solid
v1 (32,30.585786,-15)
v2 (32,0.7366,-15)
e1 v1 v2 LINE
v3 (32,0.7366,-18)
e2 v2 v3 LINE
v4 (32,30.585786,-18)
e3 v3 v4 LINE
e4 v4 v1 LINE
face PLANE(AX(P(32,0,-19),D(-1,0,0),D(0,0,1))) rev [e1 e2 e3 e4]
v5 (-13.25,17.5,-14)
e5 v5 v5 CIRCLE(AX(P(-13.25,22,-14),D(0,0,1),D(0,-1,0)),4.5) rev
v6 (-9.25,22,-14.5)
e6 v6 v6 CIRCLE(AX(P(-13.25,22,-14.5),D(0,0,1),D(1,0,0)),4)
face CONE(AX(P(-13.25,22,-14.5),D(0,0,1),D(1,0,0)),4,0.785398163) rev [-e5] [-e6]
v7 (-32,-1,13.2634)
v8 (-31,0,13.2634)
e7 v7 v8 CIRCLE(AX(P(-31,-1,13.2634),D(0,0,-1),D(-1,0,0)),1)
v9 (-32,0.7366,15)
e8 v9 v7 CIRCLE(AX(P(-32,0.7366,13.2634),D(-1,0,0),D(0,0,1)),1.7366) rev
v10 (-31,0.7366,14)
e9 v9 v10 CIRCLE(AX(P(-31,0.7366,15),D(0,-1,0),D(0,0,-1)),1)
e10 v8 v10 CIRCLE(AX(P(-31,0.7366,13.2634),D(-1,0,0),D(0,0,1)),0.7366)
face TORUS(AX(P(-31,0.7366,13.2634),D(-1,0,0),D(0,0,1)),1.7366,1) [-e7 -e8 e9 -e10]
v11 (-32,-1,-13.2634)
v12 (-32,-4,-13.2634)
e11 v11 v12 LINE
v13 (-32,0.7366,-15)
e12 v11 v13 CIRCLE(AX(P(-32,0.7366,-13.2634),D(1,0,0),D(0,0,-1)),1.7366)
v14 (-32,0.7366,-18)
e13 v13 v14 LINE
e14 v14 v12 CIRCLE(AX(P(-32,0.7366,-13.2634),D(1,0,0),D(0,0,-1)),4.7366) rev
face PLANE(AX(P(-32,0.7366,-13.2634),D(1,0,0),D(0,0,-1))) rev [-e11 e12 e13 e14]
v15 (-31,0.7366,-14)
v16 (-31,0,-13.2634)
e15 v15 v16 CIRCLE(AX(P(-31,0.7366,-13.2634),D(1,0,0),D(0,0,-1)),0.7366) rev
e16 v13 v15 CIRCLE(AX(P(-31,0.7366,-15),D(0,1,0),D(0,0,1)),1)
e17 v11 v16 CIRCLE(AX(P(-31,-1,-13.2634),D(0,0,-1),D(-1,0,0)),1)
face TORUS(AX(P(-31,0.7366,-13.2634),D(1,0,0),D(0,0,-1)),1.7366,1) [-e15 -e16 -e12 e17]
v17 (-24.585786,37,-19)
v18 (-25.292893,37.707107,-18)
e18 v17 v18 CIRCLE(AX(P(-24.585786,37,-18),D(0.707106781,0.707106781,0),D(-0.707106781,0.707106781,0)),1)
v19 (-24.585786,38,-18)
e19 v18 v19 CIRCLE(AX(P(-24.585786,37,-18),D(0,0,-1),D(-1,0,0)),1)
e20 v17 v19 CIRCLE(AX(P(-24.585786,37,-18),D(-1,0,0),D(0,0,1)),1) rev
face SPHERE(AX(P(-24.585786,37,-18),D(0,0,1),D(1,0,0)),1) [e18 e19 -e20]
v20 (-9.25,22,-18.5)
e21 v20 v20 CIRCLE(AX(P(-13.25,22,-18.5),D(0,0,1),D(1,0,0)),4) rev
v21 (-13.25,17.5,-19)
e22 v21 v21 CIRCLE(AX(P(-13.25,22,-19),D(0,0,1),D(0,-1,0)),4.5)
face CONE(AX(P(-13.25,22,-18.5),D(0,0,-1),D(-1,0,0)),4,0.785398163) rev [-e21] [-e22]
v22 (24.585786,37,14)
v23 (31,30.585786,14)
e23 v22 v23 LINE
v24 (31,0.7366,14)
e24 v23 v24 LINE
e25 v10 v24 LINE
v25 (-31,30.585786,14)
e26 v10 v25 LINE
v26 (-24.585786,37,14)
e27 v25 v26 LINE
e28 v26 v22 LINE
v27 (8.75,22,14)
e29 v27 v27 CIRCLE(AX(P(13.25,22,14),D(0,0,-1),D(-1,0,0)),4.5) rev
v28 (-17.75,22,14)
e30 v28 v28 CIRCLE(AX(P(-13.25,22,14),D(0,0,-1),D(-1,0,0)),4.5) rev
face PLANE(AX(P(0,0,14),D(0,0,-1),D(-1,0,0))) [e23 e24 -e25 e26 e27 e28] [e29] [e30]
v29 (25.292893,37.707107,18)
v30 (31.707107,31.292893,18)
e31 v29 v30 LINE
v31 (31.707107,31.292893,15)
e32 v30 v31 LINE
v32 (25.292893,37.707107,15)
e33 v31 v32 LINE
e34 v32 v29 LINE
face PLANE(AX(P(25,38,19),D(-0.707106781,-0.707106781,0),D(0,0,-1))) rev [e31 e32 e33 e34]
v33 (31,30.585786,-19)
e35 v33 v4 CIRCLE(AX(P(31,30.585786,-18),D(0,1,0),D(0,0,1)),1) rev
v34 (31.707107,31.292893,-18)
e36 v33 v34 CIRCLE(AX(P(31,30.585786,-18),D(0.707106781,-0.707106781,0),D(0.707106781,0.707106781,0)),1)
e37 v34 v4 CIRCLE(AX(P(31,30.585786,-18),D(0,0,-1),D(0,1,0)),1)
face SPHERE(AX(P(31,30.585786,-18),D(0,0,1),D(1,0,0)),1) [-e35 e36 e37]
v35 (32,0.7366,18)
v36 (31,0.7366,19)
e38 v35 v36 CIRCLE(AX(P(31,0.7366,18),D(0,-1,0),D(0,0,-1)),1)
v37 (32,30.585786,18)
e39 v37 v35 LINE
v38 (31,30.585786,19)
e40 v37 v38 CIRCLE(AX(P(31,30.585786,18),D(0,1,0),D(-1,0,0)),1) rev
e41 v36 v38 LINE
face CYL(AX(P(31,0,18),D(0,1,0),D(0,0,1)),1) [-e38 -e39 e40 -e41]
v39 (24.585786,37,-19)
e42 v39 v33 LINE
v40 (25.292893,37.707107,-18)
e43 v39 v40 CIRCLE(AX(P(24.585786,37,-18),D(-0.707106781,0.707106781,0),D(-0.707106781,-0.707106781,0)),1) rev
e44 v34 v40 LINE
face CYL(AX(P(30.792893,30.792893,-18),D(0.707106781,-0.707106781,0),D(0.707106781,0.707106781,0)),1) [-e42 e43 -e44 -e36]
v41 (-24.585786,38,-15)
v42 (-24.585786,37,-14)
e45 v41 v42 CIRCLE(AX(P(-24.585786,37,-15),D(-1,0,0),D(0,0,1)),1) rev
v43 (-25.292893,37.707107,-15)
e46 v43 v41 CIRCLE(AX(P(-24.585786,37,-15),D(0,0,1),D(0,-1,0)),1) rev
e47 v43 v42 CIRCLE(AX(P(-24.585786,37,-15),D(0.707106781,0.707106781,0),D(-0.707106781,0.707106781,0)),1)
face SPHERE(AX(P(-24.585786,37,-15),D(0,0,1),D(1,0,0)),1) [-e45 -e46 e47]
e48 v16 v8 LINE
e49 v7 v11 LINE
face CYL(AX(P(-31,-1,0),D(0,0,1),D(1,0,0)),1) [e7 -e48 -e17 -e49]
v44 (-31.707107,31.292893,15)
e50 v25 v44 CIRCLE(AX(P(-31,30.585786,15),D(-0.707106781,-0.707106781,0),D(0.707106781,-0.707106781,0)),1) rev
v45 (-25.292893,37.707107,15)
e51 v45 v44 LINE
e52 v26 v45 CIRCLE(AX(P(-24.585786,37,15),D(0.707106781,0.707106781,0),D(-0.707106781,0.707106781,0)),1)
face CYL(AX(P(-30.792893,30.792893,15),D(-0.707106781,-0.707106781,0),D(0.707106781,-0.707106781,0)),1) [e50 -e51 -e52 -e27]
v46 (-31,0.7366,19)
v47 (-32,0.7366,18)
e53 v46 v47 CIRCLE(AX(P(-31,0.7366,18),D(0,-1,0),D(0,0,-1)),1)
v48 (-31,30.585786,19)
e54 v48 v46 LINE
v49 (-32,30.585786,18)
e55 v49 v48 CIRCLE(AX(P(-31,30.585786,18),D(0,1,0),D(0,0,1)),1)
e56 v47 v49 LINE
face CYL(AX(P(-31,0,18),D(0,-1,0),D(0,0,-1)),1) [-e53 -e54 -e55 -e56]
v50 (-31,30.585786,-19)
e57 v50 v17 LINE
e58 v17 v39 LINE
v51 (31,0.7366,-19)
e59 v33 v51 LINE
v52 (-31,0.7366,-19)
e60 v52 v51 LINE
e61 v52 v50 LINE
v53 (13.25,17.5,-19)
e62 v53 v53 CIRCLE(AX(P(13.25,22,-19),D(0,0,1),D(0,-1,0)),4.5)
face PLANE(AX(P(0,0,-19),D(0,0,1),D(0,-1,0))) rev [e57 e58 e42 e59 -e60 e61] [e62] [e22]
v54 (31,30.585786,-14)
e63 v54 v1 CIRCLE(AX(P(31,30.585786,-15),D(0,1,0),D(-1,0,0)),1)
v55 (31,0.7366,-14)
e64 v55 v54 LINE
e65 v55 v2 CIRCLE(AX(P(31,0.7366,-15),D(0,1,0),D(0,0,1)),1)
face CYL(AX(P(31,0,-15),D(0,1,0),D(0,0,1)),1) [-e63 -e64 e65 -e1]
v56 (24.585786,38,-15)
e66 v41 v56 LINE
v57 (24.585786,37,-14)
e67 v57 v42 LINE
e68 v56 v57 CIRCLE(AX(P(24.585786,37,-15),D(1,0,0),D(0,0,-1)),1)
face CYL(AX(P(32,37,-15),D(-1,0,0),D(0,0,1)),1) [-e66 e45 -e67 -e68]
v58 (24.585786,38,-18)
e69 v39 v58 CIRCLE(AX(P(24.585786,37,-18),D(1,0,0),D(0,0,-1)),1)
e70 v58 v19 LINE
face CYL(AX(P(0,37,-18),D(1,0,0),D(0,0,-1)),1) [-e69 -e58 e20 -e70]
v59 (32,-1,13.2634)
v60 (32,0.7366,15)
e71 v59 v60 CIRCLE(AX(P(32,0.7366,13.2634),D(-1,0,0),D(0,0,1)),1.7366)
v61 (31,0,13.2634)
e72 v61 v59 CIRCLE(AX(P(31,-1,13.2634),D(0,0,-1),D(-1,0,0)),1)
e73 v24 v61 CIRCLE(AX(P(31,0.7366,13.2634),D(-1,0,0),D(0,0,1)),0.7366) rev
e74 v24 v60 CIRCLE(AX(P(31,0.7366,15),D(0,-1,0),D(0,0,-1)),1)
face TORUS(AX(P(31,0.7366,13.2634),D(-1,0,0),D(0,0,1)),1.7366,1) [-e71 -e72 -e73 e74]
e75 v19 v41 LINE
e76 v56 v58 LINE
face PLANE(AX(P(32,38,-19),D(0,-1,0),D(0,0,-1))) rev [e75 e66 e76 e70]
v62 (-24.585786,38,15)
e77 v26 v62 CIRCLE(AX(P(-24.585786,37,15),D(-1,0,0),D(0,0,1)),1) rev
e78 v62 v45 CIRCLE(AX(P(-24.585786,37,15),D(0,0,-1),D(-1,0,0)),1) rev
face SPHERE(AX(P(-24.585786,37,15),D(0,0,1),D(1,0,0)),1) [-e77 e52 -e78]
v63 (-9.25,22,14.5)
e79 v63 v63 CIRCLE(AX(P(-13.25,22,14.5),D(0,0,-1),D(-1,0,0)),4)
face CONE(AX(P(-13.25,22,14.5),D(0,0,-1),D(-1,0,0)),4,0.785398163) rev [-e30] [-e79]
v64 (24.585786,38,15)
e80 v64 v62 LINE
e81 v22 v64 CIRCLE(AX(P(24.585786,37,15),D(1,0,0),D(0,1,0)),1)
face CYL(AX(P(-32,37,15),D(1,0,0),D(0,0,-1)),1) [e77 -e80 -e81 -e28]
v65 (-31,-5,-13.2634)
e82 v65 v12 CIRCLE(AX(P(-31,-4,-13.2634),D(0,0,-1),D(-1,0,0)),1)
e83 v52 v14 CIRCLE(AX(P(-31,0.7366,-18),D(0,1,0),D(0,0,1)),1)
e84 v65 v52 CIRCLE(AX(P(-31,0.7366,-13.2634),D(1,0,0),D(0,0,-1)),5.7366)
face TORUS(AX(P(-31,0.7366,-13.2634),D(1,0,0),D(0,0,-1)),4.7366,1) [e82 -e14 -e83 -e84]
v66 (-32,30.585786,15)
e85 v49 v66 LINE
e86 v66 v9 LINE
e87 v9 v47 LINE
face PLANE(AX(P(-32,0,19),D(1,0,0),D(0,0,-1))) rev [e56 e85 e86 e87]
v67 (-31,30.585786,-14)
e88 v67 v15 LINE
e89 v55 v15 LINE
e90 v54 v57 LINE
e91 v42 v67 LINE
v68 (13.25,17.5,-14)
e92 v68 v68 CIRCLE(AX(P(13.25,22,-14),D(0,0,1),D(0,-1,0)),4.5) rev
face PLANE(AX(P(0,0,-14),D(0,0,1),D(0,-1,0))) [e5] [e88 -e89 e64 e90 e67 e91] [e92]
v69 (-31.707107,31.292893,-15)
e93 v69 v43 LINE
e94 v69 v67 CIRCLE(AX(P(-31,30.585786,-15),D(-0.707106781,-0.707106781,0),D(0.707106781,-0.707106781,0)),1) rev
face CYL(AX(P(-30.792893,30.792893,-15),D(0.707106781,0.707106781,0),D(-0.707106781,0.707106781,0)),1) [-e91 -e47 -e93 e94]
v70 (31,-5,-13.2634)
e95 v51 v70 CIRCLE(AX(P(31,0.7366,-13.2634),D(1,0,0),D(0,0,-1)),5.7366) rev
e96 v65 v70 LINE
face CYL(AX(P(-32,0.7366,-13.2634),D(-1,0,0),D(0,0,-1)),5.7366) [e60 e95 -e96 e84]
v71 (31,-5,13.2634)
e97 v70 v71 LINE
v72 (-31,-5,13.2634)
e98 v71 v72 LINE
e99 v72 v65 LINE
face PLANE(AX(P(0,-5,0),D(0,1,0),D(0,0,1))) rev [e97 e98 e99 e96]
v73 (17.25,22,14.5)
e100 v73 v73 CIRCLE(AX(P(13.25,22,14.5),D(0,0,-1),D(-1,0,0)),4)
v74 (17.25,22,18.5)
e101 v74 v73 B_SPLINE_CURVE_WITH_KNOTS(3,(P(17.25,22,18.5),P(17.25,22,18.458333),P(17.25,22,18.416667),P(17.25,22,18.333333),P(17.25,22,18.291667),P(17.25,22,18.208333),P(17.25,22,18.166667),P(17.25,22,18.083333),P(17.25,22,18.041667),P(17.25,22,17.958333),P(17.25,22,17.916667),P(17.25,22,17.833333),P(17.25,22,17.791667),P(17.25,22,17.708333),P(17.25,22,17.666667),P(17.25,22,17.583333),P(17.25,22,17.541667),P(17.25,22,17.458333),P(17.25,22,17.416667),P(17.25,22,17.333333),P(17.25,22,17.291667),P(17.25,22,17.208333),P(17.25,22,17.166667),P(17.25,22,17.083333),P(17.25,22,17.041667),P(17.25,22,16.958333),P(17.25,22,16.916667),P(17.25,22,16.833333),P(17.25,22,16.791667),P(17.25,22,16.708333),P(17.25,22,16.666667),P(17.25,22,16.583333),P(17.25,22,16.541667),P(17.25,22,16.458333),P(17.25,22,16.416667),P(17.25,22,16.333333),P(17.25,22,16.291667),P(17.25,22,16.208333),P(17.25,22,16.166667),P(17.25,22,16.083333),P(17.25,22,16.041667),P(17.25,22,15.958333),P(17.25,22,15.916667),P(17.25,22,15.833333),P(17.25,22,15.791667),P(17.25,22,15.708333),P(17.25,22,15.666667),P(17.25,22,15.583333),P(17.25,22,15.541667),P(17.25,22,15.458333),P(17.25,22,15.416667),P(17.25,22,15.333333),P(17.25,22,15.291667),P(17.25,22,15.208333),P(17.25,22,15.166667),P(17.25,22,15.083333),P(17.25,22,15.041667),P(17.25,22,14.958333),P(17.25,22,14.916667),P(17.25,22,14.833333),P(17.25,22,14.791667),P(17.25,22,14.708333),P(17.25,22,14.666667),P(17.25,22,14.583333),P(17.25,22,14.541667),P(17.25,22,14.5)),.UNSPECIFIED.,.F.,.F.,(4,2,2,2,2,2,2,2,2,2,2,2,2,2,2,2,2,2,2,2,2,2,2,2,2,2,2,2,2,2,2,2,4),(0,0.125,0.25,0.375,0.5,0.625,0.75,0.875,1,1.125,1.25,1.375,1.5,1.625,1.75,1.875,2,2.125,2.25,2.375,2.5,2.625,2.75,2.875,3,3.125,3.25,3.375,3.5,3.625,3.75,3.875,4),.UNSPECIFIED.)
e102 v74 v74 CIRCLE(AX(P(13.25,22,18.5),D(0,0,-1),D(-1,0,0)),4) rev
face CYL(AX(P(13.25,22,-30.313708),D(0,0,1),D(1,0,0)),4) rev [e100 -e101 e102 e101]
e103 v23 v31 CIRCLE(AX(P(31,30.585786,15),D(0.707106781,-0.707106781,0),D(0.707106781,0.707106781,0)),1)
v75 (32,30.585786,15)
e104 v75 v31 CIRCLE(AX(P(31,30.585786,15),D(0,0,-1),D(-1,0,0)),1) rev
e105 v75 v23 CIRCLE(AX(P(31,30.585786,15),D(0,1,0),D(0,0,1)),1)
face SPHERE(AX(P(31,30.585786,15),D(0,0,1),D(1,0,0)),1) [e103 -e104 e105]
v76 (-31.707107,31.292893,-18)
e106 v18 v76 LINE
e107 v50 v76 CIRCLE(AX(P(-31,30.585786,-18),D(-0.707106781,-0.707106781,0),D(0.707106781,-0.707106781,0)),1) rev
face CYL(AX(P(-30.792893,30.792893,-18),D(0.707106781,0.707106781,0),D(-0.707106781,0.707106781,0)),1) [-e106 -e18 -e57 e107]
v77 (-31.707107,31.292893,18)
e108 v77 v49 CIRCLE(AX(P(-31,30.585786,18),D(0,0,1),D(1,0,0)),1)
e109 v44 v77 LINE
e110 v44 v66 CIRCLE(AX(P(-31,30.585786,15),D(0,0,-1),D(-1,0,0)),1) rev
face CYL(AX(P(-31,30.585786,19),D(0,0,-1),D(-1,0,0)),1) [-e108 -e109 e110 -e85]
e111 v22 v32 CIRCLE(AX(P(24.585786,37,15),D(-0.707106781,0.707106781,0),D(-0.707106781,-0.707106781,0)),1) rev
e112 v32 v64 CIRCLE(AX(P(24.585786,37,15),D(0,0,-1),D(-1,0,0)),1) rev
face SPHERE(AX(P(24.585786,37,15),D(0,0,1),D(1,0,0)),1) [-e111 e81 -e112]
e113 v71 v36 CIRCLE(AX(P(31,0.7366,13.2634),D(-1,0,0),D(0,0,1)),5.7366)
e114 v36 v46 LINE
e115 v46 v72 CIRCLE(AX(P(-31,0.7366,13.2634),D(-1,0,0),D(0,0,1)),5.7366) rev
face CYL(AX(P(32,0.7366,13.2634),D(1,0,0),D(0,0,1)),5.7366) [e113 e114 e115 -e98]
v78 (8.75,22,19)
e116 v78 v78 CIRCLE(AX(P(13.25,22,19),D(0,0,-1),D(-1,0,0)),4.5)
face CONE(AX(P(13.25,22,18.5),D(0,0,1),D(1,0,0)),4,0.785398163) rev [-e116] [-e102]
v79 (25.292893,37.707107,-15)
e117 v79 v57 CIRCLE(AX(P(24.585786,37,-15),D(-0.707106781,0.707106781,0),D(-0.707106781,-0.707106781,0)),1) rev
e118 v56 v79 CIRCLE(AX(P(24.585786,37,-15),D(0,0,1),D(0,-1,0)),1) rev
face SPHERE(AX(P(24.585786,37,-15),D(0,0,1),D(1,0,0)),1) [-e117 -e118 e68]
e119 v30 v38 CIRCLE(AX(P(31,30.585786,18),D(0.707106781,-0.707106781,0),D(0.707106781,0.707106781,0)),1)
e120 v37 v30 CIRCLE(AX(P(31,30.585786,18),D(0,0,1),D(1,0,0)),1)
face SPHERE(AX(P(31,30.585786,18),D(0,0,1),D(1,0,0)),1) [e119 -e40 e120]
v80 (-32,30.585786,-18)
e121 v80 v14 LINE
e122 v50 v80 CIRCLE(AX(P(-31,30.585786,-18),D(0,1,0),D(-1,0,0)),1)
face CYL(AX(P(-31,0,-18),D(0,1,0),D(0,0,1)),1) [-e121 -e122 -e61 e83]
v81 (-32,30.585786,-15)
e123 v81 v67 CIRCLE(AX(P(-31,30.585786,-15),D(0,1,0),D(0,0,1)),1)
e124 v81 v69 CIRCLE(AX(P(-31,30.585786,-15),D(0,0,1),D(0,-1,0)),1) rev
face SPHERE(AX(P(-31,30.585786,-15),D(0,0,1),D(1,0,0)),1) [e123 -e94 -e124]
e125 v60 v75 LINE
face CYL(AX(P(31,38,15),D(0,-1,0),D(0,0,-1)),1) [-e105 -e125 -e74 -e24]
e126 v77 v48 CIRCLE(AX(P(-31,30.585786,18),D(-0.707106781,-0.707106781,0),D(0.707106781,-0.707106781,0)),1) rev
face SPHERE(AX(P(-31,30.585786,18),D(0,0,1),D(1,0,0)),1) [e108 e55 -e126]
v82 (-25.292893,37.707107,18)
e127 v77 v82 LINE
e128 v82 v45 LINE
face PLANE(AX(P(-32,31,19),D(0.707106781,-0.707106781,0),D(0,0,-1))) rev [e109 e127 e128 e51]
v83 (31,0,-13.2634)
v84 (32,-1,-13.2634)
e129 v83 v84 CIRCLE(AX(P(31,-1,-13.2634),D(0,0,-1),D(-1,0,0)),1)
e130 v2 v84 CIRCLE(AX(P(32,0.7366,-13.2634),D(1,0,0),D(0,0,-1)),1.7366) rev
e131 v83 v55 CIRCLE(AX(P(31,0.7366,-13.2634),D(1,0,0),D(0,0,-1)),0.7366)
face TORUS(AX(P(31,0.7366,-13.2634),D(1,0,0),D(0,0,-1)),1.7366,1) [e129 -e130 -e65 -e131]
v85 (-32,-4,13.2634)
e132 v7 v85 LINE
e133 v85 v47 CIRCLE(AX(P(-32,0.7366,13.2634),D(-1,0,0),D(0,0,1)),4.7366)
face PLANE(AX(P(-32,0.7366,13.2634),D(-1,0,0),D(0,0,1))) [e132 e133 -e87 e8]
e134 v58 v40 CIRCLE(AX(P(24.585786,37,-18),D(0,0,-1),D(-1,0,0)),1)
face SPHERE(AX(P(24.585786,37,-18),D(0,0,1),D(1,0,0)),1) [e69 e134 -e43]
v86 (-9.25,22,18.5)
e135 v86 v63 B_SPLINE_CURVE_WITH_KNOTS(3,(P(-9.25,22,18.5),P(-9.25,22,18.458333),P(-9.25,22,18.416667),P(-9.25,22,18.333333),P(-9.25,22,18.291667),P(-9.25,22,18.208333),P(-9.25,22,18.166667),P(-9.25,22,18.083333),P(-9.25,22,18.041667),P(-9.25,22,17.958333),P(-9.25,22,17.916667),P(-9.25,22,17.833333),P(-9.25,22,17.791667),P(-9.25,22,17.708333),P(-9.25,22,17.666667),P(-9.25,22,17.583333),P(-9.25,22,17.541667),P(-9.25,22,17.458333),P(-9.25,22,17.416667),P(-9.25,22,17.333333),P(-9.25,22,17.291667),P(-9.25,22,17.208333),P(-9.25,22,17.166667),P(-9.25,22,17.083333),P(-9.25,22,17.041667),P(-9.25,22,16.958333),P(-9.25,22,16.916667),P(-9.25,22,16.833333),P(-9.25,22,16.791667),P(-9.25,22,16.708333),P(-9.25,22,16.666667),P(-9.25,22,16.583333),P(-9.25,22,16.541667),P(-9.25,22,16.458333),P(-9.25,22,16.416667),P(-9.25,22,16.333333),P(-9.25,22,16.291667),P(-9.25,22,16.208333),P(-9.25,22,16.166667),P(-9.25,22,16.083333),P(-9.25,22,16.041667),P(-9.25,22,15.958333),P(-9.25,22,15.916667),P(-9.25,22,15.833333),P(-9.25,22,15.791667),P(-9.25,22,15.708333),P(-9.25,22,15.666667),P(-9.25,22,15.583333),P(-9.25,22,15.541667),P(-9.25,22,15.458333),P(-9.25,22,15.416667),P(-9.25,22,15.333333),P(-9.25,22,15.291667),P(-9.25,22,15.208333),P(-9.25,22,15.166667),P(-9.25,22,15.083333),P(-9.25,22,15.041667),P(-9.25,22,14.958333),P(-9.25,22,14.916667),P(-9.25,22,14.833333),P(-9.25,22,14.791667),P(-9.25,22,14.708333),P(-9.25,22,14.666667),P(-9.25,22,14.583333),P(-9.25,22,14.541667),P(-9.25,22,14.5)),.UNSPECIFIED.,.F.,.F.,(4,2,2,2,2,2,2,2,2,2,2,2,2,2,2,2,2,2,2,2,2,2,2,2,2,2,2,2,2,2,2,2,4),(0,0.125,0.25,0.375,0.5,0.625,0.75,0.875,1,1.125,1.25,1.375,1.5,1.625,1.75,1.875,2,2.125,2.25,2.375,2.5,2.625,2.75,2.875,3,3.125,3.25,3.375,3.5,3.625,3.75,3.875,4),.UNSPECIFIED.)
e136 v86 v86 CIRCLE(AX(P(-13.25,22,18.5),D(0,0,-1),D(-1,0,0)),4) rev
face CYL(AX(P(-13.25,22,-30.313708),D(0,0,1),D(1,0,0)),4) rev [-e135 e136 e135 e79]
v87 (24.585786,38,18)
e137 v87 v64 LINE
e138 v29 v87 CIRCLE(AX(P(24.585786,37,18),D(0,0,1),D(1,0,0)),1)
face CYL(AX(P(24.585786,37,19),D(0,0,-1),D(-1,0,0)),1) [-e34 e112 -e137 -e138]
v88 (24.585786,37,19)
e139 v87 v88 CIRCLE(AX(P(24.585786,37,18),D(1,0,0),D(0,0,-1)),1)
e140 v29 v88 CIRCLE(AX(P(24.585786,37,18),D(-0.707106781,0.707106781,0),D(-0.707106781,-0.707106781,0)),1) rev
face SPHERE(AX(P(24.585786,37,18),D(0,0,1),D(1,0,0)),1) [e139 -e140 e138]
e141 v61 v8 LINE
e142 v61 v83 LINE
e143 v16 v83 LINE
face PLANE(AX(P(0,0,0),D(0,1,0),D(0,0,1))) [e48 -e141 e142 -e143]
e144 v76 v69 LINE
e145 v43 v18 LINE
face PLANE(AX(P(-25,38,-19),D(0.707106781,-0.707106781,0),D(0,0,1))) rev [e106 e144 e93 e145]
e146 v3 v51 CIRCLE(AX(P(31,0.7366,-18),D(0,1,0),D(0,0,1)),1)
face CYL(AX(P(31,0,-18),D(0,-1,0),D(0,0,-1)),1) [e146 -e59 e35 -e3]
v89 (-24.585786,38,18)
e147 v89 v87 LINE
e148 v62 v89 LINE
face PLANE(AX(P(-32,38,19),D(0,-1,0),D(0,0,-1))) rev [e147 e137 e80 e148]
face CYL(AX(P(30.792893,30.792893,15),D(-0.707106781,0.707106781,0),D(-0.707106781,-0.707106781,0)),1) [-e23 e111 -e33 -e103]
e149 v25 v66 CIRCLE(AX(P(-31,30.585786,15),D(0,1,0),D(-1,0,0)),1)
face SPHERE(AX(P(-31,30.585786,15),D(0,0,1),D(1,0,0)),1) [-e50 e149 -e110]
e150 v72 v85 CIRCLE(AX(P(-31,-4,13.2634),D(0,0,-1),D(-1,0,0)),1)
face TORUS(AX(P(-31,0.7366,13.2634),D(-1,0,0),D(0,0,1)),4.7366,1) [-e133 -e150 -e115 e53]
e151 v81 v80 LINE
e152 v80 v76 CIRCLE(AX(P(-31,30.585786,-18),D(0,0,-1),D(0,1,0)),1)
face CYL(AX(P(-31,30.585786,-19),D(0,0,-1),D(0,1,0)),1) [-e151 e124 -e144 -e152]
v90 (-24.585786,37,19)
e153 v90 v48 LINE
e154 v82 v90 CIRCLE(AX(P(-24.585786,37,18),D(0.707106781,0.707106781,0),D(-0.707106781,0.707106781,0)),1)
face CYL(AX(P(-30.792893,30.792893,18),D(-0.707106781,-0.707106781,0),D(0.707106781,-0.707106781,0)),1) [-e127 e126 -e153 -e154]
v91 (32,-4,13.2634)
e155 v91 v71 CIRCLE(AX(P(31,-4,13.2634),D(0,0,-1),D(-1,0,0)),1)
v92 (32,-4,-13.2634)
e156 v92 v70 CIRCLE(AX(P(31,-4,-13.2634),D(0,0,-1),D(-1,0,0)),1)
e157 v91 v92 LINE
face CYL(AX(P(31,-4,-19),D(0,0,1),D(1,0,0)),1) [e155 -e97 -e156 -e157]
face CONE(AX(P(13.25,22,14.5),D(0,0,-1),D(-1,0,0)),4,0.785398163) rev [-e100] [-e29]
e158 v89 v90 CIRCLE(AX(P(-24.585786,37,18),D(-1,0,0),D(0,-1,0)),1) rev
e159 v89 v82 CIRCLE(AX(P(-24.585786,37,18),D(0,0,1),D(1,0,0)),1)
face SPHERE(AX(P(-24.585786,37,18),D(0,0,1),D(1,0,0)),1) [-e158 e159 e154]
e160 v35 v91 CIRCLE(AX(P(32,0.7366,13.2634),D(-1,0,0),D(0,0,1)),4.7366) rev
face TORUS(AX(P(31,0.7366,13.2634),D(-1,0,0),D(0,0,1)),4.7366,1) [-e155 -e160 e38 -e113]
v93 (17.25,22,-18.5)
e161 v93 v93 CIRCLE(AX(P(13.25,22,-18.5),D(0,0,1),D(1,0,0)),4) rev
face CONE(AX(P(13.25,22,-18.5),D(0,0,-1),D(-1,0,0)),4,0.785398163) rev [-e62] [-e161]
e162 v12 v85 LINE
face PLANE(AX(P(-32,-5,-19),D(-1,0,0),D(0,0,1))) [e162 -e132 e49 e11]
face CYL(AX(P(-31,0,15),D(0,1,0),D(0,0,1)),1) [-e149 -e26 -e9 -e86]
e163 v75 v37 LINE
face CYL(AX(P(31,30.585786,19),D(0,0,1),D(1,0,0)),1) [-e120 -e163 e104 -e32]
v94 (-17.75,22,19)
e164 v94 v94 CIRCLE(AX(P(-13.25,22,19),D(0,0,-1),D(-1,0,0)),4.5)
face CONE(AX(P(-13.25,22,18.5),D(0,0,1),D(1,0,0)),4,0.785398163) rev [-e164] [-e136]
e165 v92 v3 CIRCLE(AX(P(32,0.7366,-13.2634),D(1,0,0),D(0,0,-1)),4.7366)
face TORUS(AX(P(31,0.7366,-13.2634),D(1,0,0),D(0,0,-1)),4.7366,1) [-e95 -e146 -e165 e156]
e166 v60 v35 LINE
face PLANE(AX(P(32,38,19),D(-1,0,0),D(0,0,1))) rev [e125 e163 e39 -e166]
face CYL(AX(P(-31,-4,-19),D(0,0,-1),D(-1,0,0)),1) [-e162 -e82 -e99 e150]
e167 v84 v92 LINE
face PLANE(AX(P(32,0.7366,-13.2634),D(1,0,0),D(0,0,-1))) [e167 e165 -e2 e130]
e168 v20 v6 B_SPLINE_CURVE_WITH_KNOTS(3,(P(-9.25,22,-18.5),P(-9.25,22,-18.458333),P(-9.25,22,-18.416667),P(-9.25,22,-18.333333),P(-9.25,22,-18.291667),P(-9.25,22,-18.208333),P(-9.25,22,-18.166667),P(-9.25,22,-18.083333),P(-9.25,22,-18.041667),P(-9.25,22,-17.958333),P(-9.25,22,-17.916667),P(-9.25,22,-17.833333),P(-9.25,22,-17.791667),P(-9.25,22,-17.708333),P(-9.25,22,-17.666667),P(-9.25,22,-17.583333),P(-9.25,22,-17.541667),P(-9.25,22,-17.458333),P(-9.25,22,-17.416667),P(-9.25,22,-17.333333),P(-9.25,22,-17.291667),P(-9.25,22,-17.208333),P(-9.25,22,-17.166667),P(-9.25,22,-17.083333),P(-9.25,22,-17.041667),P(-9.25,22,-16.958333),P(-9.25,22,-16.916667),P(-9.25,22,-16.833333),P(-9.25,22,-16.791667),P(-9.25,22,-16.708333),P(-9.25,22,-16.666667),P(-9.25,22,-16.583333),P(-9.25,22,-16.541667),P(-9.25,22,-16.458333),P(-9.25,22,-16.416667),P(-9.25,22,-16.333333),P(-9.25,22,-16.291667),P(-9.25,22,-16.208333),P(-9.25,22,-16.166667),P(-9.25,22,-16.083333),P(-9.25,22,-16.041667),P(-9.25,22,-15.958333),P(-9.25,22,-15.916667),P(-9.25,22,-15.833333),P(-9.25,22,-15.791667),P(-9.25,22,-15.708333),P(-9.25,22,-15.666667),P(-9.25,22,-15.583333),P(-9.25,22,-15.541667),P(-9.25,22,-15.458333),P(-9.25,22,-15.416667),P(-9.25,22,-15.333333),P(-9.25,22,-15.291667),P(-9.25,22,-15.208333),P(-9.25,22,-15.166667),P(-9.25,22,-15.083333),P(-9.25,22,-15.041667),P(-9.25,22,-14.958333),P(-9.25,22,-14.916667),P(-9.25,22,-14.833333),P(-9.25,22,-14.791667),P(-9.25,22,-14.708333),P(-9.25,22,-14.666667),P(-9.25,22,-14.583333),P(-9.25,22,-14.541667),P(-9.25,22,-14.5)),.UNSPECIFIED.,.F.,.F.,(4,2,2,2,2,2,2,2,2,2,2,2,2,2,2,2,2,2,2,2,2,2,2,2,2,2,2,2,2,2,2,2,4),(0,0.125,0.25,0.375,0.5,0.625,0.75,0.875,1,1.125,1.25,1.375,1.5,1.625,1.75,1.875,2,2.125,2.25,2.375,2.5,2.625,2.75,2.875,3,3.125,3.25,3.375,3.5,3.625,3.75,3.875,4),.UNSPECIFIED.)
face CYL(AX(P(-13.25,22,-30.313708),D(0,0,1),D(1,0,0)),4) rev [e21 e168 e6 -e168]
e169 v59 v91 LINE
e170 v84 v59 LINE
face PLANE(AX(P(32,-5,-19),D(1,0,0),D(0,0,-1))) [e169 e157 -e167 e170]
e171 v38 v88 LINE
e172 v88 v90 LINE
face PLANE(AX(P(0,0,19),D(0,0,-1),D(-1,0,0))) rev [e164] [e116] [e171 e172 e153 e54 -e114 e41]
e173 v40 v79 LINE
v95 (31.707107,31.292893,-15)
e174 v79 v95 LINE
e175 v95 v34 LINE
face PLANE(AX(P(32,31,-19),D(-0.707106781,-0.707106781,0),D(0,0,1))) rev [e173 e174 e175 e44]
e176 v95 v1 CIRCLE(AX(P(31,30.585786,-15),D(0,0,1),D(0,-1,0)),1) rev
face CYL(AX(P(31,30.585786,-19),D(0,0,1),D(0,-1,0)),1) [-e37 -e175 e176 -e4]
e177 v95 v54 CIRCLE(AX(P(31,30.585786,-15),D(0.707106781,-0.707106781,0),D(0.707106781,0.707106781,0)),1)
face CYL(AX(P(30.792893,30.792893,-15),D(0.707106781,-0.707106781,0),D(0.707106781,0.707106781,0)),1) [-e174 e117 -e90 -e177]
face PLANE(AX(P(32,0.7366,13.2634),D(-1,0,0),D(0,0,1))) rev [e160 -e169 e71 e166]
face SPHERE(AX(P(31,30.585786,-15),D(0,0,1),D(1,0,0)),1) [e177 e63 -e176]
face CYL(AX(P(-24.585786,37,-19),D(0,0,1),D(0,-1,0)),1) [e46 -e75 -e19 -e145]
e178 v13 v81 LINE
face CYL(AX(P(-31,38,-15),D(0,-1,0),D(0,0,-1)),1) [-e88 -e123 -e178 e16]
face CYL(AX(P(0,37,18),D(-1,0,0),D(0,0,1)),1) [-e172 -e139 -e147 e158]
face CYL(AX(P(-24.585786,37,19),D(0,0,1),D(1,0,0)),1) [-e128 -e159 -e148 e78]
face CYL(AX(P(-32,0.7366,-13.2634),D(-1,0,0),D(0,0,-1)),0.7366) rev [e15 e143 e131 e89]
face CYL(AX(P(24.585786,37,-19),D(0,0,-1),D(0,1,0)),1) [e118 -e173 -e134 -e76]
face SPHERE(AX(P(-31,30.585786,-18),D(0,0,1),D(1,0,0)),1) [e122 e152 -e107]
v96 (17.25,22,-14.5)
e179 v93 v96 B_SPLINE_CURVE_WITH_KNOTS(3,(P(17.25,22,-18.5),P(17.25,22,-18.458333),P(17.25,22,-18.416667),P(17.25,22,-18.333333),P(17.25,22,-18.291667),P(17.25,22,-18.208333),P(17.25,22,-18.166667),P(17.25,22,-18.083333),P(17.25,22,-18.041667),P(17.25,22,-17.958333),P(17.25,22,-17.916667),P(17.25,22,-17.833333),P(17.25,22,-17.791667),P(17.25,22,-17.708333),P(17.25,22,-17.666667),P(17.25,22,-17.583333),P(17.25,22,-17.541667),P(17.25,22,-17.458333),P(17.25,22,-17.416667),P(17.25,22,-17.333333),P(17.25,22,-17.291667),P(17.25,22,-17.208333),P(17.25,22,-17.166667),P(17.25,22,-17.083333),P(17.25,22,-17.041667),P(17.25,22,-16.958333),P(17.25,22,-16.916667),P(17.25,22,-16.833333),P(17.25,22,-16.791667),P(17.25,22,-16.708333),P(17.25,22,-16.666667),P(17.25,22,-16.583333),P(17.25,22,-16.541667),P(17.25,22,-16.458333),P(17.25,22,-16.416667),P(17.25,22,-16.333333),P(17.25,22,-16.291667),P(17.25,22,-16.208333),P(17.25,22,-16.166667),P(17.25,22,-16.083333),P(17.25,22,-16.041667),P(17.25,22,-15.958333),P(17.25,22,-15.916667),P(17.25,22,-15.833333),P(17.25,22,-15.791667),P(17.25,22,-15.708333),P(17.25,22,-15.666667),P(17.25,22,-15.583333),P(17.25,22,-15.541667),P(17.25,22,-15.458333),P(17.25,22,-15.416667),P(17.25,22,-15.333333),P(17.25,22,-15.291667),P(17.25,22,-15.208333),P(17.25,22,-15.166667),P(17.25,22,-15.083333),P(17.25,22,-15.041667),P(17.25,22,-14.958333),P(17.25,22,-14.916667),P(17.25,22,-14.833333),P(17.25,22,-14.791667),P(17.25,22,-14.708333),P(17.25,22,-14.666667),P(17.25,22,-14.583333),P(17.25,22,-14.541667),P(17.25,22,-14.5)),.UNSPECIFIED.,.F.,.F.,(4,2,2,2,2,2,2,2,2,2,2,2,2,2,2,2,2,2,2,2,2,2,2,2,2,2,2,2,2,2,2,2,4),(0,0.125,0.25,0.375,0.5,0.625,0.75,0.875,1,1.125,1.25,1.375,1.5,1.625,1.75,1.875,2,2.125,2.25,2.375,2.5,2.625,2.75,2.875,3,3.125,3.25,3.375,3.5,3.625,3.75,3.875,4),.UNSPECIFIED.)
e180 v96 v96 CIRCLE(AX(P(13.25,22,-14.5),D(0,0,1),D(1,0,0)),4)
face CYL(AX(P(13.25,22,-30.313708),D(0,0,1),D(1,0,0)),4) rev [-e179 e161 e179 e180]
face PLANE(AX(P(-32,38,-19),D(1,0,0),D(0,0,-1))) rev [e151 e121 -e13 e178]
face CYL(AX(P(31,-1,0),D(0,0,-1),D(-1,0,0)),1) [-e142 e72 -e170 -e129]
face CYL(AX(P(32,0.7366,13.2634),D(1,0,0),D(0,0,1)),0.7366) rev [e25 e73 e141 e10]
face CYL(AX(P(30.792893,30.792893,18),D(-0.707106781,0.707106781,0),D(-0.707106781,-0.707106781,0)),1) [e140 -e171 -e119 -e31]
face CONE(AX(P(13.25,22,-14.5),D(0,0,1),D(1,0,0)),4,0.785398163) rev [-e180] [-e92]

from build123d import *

# Parameters (mm, degrees)
SKETCH1_W                      = 64
SKETCH1_H                      = 38
BASE_FLANGE1_DEPTH             = 5
EDGE_FLANGE1_STRIP_W           = 21.4732
EDGE_FLANGE1_STRIP_H           = 5
EDGE_FLANGE1_STRIP_CUT_DEPTH   = 64
EDGE_FLANGE1_STRIP_2_W         = 21.4732
EDGE_FLANGE1_STRIP_2_H         = 5
EDGE_FLANGE1_STRIP_CUT_2_DEPTH = 64
EDGE_FLANGE1_DEPTH             = 64
EDGE_FLANGE1_BEND_DEPTH        = 64
BREAK_CORNER1_START            = -19
BREAK_CORNER1_DEPTH            = 38
CUT_EXTRUDE1_REACH             = 64.546
SKETCH12_R                     = 4
FILLET2_R                      = 1
CHAMFER1_SIZE                  = 0.5


# Read off the part's stored shape, not the designer's step: Break-Corner1
# Sheet-metal steps are written as plain solids
with BuildPart() as part:
    # Sketch1 → Base-Flange1 (new body)
    with BuildSketch(Plane(origin=(0, 0, 0), x_dir=(1, 0, 0), z_dir=(0, 1, 0))):
        Rectangle(SKETCH1_W, SKETCH1_H)
    extrude(amount=-BASE_FLANGE1_DEPTH)

    # Edge-Flange1 strip (across the edge) → Edge-Flange1 strip cut (cut)
    with BuildSketch(Plane(origin=(-32, 0, 19), x_dir=(0, 0, -1), z_dir=(1, 0, 0))):
        with Locations((-5, -2.5)):
            Rectangle(EDGE_FLANGE1_STRIP_W, EDGE_FLANGE1_STRIP_H)
    extrude(amount=EDGE_FLANGE1_STRIP_CUT_DEPTH, mode=Mode.SUBTRACT)

    # Edge-Flange1 strip 2 (across the edge) → Edge-Flange1 strip cut 2 (cut)
    with BuildSketch(Plane(origin=(32, 0, -19), x_dir=(0, 0, 1), z_dir=(-1, 0, 0))):
        with Locations((-5, -2.5)):
            Rectangle(EDGE_FLANGE1_STRIP_2_W, EDGE_FLANGE1_STRIP_2_H)
    extrude(amount=EDGE_FLANGE1_STRIP_CUT_2_DEPTH, mode=Mode.SUBTRACT)

    # Edge-Flange1 section (across the edge) → Edge-Flange1 (add)
    with BuildSketch(Plane(origin=(-32, 0, 19), x_dir=(0, 0, -1), z_dir=(1, 0, 0))):
        with BuildLine():
            Line((0, 0.7366), (0, 38))
            Line((0, 38), (5, 38))
            Line((5, 38), (5, 0.7366))
            ThreePointArc((5, 0.7366), (5.215745145, 0.215745145), (5.7366, 0))
            Line((5.7366, 0), (5.7366, -5))
            ThreePointArc((5.7366, -5), (1.680211239, -3.319788761), (0, 0.7366))
        make_face()
    extrude(amount=EDGE_FLANGE1_DEPTH)

    # Edge-Flange1 section 2 (across the edge) → Edge-Flange1 bend (add)
    with BuildSketch(Plane(origin=(32, 0, -19), x_dir=(0, 0, 1), z_dir=(-1, 0, 0))):
        with BuildLine():
            Line((0, 0.7366), (0, 38))
            Line((0, 38), (5, 38))
            Line((5, 38), (5, 0.7366))
            ThreePointArc((5, 0.7366), (5.215745145, 0.215745145), (5.7366, 0))
            Line((5.7366, 0), (5.7366, -5))
            ThreePointArc((5.7366, -5), (1.680211239, -3.319788761), (0, 0.7366))
        make_face()
    extrude(amount=EDGE_FLANGE1_BEND_DEPTH)

    # Break-Corner1 outline → Break-Corner1 (cut)
    with BuildSketch(Plane.XY.offset(BREAK_CORNER1_START)):
        Polygon((-32, 38), (-32, 31), (-25, 38), align=None)
        Polygon((32, 38), (25, 38), (32, 31), align=None)
    extrude(amount=BREAK_CORNER1_DEPTH, mode=Mode.SUBTRACT)

    # Cut-Extrude1: up to this face of the body (flat: up to its plane)
    cut_extrude1_end = Plane(part.part.faces().sort_by_distance((0, 19.026404173, -19))[0])
    # Sketch12 → Cut-Extrude1 (cut, up to the picked face)
    with BuildSketch(Plane.XY.offset(19), mode=Mode.PRIVATE) as cut_extrude1_sk1:
        with Locations((-13.25, 22)):
            Circle(SKETCH12_R)
    cut_extrude1_tool1 = split(extrude(cut_extrude1_sk1.sketch, amount=-CUT_EXTRUDE1_REACH, mode=Mode.PRIVATE), bisect_by=cut_extrude1_end, keep=Keep.BOTH, mode=Mode.PRIVATE)
    # Sketch12 → Cut-Extrude1 (cut, up to the picked face)
    with BuildSketch(Plane.XY.offset(19), mode=Mode.PRIVATE) as cut_extrude1_sk2:
        with Locations((13.25, 22)):
            Circle(SKETCH12_R)
    cut_extrude1_tool2 = split(extrude(cut_extrude1_sk2.sketch, amount=-CUT_EXTRUDE1_REACH, mode=Mode.PRIVATE), bisect_by=cut_extrude1_end, keep=Keep.BOTH, mode=Mode.PRIVATE)
    add(cut_extrude1_tool1.solids().sort_by(Axis((-13.25, 22, 19), (0, 0, -1)))[0], mode=Mode.SUBTRACT)
    add(cut_extrude1_tool2.solids().sort_by(Axis((13.25, 22, 19), (0, 0, -1)))[0], mode=Mode.SUBTRACT)

    # Fillet2
    fillet2_edges = [part.edges().sort_by_distance(p)[0] for p in [
        (-28.5, 34.5, 14),
        (-25, 38, 16.5),
        (-28.5, 34.5, 19),
        (32, 0, 0),
        (32, -5, 0),
        (-32, 0, 0),
        (-32, -5, 0),
        (-32, -3.319788761, 17.319788761),
        (32, -3.319788761, 17.319788761),
        (-32, 0.215745145, 13.784254855),
        (32, 0.215745145, 13.784254855),
        (32, 15.8683, 14),
        (32, 15.8683, 19),
        (32, -3.319788761, -17.319788761),
        (-32, -3.319788761, -17.319788761),
        (32, 0.215745145, -13.784254855),
        (-32, 0.215745145, -13.784254855),
        (-32, 15.8683, -14),
        (-32, 15.8683, -19),
        (0, 38, -14),
        (0, 38, -19),
        (-25, 38, -16.5),
        (-28.5, 34.5, -14),
        (-32, 31, -16.5),
        (-28.5, 34.5, -19),
        (32, 15.8683, -19),
        (32, 15.8683, -14),
        (32, 31, -16.5),
        (28.5, 34.5, -14),
        (25, 38, -16.5),
        (28.5, 34.5, -19),
        (0, 38, 14),
        (0, 38, 19),
        (25, 38, 16.5),
        (28.5, 34.5, 14),
        (32, 31, 16.5),
        (28.5, 34.5, 19),
        (-32, 15.8683, 19),
        (-32, 15.8683, 14),
        (-32, 31, 16.5),
    ]]
    fillet(fillet2_edges, radius=FILLET2_R)

    # Chamfer1
    chamfer1_edges = [part.edges().sort_by_distance(p)[0] for p in [
        (-17.25, 22, -14),
        (-17.25, 22, 14),
        (-17.25, 22, 19),
        (-17.25, 22, -19),
        (9.25, 22, -14),
        (9.25, 22, 14),
        (9.25, 22, 19),
        (9.25, 22, -19),
    ]]
    chamfer(chamfer1_edges, length=CHAMFER1_SIZE)


solid = part.part
